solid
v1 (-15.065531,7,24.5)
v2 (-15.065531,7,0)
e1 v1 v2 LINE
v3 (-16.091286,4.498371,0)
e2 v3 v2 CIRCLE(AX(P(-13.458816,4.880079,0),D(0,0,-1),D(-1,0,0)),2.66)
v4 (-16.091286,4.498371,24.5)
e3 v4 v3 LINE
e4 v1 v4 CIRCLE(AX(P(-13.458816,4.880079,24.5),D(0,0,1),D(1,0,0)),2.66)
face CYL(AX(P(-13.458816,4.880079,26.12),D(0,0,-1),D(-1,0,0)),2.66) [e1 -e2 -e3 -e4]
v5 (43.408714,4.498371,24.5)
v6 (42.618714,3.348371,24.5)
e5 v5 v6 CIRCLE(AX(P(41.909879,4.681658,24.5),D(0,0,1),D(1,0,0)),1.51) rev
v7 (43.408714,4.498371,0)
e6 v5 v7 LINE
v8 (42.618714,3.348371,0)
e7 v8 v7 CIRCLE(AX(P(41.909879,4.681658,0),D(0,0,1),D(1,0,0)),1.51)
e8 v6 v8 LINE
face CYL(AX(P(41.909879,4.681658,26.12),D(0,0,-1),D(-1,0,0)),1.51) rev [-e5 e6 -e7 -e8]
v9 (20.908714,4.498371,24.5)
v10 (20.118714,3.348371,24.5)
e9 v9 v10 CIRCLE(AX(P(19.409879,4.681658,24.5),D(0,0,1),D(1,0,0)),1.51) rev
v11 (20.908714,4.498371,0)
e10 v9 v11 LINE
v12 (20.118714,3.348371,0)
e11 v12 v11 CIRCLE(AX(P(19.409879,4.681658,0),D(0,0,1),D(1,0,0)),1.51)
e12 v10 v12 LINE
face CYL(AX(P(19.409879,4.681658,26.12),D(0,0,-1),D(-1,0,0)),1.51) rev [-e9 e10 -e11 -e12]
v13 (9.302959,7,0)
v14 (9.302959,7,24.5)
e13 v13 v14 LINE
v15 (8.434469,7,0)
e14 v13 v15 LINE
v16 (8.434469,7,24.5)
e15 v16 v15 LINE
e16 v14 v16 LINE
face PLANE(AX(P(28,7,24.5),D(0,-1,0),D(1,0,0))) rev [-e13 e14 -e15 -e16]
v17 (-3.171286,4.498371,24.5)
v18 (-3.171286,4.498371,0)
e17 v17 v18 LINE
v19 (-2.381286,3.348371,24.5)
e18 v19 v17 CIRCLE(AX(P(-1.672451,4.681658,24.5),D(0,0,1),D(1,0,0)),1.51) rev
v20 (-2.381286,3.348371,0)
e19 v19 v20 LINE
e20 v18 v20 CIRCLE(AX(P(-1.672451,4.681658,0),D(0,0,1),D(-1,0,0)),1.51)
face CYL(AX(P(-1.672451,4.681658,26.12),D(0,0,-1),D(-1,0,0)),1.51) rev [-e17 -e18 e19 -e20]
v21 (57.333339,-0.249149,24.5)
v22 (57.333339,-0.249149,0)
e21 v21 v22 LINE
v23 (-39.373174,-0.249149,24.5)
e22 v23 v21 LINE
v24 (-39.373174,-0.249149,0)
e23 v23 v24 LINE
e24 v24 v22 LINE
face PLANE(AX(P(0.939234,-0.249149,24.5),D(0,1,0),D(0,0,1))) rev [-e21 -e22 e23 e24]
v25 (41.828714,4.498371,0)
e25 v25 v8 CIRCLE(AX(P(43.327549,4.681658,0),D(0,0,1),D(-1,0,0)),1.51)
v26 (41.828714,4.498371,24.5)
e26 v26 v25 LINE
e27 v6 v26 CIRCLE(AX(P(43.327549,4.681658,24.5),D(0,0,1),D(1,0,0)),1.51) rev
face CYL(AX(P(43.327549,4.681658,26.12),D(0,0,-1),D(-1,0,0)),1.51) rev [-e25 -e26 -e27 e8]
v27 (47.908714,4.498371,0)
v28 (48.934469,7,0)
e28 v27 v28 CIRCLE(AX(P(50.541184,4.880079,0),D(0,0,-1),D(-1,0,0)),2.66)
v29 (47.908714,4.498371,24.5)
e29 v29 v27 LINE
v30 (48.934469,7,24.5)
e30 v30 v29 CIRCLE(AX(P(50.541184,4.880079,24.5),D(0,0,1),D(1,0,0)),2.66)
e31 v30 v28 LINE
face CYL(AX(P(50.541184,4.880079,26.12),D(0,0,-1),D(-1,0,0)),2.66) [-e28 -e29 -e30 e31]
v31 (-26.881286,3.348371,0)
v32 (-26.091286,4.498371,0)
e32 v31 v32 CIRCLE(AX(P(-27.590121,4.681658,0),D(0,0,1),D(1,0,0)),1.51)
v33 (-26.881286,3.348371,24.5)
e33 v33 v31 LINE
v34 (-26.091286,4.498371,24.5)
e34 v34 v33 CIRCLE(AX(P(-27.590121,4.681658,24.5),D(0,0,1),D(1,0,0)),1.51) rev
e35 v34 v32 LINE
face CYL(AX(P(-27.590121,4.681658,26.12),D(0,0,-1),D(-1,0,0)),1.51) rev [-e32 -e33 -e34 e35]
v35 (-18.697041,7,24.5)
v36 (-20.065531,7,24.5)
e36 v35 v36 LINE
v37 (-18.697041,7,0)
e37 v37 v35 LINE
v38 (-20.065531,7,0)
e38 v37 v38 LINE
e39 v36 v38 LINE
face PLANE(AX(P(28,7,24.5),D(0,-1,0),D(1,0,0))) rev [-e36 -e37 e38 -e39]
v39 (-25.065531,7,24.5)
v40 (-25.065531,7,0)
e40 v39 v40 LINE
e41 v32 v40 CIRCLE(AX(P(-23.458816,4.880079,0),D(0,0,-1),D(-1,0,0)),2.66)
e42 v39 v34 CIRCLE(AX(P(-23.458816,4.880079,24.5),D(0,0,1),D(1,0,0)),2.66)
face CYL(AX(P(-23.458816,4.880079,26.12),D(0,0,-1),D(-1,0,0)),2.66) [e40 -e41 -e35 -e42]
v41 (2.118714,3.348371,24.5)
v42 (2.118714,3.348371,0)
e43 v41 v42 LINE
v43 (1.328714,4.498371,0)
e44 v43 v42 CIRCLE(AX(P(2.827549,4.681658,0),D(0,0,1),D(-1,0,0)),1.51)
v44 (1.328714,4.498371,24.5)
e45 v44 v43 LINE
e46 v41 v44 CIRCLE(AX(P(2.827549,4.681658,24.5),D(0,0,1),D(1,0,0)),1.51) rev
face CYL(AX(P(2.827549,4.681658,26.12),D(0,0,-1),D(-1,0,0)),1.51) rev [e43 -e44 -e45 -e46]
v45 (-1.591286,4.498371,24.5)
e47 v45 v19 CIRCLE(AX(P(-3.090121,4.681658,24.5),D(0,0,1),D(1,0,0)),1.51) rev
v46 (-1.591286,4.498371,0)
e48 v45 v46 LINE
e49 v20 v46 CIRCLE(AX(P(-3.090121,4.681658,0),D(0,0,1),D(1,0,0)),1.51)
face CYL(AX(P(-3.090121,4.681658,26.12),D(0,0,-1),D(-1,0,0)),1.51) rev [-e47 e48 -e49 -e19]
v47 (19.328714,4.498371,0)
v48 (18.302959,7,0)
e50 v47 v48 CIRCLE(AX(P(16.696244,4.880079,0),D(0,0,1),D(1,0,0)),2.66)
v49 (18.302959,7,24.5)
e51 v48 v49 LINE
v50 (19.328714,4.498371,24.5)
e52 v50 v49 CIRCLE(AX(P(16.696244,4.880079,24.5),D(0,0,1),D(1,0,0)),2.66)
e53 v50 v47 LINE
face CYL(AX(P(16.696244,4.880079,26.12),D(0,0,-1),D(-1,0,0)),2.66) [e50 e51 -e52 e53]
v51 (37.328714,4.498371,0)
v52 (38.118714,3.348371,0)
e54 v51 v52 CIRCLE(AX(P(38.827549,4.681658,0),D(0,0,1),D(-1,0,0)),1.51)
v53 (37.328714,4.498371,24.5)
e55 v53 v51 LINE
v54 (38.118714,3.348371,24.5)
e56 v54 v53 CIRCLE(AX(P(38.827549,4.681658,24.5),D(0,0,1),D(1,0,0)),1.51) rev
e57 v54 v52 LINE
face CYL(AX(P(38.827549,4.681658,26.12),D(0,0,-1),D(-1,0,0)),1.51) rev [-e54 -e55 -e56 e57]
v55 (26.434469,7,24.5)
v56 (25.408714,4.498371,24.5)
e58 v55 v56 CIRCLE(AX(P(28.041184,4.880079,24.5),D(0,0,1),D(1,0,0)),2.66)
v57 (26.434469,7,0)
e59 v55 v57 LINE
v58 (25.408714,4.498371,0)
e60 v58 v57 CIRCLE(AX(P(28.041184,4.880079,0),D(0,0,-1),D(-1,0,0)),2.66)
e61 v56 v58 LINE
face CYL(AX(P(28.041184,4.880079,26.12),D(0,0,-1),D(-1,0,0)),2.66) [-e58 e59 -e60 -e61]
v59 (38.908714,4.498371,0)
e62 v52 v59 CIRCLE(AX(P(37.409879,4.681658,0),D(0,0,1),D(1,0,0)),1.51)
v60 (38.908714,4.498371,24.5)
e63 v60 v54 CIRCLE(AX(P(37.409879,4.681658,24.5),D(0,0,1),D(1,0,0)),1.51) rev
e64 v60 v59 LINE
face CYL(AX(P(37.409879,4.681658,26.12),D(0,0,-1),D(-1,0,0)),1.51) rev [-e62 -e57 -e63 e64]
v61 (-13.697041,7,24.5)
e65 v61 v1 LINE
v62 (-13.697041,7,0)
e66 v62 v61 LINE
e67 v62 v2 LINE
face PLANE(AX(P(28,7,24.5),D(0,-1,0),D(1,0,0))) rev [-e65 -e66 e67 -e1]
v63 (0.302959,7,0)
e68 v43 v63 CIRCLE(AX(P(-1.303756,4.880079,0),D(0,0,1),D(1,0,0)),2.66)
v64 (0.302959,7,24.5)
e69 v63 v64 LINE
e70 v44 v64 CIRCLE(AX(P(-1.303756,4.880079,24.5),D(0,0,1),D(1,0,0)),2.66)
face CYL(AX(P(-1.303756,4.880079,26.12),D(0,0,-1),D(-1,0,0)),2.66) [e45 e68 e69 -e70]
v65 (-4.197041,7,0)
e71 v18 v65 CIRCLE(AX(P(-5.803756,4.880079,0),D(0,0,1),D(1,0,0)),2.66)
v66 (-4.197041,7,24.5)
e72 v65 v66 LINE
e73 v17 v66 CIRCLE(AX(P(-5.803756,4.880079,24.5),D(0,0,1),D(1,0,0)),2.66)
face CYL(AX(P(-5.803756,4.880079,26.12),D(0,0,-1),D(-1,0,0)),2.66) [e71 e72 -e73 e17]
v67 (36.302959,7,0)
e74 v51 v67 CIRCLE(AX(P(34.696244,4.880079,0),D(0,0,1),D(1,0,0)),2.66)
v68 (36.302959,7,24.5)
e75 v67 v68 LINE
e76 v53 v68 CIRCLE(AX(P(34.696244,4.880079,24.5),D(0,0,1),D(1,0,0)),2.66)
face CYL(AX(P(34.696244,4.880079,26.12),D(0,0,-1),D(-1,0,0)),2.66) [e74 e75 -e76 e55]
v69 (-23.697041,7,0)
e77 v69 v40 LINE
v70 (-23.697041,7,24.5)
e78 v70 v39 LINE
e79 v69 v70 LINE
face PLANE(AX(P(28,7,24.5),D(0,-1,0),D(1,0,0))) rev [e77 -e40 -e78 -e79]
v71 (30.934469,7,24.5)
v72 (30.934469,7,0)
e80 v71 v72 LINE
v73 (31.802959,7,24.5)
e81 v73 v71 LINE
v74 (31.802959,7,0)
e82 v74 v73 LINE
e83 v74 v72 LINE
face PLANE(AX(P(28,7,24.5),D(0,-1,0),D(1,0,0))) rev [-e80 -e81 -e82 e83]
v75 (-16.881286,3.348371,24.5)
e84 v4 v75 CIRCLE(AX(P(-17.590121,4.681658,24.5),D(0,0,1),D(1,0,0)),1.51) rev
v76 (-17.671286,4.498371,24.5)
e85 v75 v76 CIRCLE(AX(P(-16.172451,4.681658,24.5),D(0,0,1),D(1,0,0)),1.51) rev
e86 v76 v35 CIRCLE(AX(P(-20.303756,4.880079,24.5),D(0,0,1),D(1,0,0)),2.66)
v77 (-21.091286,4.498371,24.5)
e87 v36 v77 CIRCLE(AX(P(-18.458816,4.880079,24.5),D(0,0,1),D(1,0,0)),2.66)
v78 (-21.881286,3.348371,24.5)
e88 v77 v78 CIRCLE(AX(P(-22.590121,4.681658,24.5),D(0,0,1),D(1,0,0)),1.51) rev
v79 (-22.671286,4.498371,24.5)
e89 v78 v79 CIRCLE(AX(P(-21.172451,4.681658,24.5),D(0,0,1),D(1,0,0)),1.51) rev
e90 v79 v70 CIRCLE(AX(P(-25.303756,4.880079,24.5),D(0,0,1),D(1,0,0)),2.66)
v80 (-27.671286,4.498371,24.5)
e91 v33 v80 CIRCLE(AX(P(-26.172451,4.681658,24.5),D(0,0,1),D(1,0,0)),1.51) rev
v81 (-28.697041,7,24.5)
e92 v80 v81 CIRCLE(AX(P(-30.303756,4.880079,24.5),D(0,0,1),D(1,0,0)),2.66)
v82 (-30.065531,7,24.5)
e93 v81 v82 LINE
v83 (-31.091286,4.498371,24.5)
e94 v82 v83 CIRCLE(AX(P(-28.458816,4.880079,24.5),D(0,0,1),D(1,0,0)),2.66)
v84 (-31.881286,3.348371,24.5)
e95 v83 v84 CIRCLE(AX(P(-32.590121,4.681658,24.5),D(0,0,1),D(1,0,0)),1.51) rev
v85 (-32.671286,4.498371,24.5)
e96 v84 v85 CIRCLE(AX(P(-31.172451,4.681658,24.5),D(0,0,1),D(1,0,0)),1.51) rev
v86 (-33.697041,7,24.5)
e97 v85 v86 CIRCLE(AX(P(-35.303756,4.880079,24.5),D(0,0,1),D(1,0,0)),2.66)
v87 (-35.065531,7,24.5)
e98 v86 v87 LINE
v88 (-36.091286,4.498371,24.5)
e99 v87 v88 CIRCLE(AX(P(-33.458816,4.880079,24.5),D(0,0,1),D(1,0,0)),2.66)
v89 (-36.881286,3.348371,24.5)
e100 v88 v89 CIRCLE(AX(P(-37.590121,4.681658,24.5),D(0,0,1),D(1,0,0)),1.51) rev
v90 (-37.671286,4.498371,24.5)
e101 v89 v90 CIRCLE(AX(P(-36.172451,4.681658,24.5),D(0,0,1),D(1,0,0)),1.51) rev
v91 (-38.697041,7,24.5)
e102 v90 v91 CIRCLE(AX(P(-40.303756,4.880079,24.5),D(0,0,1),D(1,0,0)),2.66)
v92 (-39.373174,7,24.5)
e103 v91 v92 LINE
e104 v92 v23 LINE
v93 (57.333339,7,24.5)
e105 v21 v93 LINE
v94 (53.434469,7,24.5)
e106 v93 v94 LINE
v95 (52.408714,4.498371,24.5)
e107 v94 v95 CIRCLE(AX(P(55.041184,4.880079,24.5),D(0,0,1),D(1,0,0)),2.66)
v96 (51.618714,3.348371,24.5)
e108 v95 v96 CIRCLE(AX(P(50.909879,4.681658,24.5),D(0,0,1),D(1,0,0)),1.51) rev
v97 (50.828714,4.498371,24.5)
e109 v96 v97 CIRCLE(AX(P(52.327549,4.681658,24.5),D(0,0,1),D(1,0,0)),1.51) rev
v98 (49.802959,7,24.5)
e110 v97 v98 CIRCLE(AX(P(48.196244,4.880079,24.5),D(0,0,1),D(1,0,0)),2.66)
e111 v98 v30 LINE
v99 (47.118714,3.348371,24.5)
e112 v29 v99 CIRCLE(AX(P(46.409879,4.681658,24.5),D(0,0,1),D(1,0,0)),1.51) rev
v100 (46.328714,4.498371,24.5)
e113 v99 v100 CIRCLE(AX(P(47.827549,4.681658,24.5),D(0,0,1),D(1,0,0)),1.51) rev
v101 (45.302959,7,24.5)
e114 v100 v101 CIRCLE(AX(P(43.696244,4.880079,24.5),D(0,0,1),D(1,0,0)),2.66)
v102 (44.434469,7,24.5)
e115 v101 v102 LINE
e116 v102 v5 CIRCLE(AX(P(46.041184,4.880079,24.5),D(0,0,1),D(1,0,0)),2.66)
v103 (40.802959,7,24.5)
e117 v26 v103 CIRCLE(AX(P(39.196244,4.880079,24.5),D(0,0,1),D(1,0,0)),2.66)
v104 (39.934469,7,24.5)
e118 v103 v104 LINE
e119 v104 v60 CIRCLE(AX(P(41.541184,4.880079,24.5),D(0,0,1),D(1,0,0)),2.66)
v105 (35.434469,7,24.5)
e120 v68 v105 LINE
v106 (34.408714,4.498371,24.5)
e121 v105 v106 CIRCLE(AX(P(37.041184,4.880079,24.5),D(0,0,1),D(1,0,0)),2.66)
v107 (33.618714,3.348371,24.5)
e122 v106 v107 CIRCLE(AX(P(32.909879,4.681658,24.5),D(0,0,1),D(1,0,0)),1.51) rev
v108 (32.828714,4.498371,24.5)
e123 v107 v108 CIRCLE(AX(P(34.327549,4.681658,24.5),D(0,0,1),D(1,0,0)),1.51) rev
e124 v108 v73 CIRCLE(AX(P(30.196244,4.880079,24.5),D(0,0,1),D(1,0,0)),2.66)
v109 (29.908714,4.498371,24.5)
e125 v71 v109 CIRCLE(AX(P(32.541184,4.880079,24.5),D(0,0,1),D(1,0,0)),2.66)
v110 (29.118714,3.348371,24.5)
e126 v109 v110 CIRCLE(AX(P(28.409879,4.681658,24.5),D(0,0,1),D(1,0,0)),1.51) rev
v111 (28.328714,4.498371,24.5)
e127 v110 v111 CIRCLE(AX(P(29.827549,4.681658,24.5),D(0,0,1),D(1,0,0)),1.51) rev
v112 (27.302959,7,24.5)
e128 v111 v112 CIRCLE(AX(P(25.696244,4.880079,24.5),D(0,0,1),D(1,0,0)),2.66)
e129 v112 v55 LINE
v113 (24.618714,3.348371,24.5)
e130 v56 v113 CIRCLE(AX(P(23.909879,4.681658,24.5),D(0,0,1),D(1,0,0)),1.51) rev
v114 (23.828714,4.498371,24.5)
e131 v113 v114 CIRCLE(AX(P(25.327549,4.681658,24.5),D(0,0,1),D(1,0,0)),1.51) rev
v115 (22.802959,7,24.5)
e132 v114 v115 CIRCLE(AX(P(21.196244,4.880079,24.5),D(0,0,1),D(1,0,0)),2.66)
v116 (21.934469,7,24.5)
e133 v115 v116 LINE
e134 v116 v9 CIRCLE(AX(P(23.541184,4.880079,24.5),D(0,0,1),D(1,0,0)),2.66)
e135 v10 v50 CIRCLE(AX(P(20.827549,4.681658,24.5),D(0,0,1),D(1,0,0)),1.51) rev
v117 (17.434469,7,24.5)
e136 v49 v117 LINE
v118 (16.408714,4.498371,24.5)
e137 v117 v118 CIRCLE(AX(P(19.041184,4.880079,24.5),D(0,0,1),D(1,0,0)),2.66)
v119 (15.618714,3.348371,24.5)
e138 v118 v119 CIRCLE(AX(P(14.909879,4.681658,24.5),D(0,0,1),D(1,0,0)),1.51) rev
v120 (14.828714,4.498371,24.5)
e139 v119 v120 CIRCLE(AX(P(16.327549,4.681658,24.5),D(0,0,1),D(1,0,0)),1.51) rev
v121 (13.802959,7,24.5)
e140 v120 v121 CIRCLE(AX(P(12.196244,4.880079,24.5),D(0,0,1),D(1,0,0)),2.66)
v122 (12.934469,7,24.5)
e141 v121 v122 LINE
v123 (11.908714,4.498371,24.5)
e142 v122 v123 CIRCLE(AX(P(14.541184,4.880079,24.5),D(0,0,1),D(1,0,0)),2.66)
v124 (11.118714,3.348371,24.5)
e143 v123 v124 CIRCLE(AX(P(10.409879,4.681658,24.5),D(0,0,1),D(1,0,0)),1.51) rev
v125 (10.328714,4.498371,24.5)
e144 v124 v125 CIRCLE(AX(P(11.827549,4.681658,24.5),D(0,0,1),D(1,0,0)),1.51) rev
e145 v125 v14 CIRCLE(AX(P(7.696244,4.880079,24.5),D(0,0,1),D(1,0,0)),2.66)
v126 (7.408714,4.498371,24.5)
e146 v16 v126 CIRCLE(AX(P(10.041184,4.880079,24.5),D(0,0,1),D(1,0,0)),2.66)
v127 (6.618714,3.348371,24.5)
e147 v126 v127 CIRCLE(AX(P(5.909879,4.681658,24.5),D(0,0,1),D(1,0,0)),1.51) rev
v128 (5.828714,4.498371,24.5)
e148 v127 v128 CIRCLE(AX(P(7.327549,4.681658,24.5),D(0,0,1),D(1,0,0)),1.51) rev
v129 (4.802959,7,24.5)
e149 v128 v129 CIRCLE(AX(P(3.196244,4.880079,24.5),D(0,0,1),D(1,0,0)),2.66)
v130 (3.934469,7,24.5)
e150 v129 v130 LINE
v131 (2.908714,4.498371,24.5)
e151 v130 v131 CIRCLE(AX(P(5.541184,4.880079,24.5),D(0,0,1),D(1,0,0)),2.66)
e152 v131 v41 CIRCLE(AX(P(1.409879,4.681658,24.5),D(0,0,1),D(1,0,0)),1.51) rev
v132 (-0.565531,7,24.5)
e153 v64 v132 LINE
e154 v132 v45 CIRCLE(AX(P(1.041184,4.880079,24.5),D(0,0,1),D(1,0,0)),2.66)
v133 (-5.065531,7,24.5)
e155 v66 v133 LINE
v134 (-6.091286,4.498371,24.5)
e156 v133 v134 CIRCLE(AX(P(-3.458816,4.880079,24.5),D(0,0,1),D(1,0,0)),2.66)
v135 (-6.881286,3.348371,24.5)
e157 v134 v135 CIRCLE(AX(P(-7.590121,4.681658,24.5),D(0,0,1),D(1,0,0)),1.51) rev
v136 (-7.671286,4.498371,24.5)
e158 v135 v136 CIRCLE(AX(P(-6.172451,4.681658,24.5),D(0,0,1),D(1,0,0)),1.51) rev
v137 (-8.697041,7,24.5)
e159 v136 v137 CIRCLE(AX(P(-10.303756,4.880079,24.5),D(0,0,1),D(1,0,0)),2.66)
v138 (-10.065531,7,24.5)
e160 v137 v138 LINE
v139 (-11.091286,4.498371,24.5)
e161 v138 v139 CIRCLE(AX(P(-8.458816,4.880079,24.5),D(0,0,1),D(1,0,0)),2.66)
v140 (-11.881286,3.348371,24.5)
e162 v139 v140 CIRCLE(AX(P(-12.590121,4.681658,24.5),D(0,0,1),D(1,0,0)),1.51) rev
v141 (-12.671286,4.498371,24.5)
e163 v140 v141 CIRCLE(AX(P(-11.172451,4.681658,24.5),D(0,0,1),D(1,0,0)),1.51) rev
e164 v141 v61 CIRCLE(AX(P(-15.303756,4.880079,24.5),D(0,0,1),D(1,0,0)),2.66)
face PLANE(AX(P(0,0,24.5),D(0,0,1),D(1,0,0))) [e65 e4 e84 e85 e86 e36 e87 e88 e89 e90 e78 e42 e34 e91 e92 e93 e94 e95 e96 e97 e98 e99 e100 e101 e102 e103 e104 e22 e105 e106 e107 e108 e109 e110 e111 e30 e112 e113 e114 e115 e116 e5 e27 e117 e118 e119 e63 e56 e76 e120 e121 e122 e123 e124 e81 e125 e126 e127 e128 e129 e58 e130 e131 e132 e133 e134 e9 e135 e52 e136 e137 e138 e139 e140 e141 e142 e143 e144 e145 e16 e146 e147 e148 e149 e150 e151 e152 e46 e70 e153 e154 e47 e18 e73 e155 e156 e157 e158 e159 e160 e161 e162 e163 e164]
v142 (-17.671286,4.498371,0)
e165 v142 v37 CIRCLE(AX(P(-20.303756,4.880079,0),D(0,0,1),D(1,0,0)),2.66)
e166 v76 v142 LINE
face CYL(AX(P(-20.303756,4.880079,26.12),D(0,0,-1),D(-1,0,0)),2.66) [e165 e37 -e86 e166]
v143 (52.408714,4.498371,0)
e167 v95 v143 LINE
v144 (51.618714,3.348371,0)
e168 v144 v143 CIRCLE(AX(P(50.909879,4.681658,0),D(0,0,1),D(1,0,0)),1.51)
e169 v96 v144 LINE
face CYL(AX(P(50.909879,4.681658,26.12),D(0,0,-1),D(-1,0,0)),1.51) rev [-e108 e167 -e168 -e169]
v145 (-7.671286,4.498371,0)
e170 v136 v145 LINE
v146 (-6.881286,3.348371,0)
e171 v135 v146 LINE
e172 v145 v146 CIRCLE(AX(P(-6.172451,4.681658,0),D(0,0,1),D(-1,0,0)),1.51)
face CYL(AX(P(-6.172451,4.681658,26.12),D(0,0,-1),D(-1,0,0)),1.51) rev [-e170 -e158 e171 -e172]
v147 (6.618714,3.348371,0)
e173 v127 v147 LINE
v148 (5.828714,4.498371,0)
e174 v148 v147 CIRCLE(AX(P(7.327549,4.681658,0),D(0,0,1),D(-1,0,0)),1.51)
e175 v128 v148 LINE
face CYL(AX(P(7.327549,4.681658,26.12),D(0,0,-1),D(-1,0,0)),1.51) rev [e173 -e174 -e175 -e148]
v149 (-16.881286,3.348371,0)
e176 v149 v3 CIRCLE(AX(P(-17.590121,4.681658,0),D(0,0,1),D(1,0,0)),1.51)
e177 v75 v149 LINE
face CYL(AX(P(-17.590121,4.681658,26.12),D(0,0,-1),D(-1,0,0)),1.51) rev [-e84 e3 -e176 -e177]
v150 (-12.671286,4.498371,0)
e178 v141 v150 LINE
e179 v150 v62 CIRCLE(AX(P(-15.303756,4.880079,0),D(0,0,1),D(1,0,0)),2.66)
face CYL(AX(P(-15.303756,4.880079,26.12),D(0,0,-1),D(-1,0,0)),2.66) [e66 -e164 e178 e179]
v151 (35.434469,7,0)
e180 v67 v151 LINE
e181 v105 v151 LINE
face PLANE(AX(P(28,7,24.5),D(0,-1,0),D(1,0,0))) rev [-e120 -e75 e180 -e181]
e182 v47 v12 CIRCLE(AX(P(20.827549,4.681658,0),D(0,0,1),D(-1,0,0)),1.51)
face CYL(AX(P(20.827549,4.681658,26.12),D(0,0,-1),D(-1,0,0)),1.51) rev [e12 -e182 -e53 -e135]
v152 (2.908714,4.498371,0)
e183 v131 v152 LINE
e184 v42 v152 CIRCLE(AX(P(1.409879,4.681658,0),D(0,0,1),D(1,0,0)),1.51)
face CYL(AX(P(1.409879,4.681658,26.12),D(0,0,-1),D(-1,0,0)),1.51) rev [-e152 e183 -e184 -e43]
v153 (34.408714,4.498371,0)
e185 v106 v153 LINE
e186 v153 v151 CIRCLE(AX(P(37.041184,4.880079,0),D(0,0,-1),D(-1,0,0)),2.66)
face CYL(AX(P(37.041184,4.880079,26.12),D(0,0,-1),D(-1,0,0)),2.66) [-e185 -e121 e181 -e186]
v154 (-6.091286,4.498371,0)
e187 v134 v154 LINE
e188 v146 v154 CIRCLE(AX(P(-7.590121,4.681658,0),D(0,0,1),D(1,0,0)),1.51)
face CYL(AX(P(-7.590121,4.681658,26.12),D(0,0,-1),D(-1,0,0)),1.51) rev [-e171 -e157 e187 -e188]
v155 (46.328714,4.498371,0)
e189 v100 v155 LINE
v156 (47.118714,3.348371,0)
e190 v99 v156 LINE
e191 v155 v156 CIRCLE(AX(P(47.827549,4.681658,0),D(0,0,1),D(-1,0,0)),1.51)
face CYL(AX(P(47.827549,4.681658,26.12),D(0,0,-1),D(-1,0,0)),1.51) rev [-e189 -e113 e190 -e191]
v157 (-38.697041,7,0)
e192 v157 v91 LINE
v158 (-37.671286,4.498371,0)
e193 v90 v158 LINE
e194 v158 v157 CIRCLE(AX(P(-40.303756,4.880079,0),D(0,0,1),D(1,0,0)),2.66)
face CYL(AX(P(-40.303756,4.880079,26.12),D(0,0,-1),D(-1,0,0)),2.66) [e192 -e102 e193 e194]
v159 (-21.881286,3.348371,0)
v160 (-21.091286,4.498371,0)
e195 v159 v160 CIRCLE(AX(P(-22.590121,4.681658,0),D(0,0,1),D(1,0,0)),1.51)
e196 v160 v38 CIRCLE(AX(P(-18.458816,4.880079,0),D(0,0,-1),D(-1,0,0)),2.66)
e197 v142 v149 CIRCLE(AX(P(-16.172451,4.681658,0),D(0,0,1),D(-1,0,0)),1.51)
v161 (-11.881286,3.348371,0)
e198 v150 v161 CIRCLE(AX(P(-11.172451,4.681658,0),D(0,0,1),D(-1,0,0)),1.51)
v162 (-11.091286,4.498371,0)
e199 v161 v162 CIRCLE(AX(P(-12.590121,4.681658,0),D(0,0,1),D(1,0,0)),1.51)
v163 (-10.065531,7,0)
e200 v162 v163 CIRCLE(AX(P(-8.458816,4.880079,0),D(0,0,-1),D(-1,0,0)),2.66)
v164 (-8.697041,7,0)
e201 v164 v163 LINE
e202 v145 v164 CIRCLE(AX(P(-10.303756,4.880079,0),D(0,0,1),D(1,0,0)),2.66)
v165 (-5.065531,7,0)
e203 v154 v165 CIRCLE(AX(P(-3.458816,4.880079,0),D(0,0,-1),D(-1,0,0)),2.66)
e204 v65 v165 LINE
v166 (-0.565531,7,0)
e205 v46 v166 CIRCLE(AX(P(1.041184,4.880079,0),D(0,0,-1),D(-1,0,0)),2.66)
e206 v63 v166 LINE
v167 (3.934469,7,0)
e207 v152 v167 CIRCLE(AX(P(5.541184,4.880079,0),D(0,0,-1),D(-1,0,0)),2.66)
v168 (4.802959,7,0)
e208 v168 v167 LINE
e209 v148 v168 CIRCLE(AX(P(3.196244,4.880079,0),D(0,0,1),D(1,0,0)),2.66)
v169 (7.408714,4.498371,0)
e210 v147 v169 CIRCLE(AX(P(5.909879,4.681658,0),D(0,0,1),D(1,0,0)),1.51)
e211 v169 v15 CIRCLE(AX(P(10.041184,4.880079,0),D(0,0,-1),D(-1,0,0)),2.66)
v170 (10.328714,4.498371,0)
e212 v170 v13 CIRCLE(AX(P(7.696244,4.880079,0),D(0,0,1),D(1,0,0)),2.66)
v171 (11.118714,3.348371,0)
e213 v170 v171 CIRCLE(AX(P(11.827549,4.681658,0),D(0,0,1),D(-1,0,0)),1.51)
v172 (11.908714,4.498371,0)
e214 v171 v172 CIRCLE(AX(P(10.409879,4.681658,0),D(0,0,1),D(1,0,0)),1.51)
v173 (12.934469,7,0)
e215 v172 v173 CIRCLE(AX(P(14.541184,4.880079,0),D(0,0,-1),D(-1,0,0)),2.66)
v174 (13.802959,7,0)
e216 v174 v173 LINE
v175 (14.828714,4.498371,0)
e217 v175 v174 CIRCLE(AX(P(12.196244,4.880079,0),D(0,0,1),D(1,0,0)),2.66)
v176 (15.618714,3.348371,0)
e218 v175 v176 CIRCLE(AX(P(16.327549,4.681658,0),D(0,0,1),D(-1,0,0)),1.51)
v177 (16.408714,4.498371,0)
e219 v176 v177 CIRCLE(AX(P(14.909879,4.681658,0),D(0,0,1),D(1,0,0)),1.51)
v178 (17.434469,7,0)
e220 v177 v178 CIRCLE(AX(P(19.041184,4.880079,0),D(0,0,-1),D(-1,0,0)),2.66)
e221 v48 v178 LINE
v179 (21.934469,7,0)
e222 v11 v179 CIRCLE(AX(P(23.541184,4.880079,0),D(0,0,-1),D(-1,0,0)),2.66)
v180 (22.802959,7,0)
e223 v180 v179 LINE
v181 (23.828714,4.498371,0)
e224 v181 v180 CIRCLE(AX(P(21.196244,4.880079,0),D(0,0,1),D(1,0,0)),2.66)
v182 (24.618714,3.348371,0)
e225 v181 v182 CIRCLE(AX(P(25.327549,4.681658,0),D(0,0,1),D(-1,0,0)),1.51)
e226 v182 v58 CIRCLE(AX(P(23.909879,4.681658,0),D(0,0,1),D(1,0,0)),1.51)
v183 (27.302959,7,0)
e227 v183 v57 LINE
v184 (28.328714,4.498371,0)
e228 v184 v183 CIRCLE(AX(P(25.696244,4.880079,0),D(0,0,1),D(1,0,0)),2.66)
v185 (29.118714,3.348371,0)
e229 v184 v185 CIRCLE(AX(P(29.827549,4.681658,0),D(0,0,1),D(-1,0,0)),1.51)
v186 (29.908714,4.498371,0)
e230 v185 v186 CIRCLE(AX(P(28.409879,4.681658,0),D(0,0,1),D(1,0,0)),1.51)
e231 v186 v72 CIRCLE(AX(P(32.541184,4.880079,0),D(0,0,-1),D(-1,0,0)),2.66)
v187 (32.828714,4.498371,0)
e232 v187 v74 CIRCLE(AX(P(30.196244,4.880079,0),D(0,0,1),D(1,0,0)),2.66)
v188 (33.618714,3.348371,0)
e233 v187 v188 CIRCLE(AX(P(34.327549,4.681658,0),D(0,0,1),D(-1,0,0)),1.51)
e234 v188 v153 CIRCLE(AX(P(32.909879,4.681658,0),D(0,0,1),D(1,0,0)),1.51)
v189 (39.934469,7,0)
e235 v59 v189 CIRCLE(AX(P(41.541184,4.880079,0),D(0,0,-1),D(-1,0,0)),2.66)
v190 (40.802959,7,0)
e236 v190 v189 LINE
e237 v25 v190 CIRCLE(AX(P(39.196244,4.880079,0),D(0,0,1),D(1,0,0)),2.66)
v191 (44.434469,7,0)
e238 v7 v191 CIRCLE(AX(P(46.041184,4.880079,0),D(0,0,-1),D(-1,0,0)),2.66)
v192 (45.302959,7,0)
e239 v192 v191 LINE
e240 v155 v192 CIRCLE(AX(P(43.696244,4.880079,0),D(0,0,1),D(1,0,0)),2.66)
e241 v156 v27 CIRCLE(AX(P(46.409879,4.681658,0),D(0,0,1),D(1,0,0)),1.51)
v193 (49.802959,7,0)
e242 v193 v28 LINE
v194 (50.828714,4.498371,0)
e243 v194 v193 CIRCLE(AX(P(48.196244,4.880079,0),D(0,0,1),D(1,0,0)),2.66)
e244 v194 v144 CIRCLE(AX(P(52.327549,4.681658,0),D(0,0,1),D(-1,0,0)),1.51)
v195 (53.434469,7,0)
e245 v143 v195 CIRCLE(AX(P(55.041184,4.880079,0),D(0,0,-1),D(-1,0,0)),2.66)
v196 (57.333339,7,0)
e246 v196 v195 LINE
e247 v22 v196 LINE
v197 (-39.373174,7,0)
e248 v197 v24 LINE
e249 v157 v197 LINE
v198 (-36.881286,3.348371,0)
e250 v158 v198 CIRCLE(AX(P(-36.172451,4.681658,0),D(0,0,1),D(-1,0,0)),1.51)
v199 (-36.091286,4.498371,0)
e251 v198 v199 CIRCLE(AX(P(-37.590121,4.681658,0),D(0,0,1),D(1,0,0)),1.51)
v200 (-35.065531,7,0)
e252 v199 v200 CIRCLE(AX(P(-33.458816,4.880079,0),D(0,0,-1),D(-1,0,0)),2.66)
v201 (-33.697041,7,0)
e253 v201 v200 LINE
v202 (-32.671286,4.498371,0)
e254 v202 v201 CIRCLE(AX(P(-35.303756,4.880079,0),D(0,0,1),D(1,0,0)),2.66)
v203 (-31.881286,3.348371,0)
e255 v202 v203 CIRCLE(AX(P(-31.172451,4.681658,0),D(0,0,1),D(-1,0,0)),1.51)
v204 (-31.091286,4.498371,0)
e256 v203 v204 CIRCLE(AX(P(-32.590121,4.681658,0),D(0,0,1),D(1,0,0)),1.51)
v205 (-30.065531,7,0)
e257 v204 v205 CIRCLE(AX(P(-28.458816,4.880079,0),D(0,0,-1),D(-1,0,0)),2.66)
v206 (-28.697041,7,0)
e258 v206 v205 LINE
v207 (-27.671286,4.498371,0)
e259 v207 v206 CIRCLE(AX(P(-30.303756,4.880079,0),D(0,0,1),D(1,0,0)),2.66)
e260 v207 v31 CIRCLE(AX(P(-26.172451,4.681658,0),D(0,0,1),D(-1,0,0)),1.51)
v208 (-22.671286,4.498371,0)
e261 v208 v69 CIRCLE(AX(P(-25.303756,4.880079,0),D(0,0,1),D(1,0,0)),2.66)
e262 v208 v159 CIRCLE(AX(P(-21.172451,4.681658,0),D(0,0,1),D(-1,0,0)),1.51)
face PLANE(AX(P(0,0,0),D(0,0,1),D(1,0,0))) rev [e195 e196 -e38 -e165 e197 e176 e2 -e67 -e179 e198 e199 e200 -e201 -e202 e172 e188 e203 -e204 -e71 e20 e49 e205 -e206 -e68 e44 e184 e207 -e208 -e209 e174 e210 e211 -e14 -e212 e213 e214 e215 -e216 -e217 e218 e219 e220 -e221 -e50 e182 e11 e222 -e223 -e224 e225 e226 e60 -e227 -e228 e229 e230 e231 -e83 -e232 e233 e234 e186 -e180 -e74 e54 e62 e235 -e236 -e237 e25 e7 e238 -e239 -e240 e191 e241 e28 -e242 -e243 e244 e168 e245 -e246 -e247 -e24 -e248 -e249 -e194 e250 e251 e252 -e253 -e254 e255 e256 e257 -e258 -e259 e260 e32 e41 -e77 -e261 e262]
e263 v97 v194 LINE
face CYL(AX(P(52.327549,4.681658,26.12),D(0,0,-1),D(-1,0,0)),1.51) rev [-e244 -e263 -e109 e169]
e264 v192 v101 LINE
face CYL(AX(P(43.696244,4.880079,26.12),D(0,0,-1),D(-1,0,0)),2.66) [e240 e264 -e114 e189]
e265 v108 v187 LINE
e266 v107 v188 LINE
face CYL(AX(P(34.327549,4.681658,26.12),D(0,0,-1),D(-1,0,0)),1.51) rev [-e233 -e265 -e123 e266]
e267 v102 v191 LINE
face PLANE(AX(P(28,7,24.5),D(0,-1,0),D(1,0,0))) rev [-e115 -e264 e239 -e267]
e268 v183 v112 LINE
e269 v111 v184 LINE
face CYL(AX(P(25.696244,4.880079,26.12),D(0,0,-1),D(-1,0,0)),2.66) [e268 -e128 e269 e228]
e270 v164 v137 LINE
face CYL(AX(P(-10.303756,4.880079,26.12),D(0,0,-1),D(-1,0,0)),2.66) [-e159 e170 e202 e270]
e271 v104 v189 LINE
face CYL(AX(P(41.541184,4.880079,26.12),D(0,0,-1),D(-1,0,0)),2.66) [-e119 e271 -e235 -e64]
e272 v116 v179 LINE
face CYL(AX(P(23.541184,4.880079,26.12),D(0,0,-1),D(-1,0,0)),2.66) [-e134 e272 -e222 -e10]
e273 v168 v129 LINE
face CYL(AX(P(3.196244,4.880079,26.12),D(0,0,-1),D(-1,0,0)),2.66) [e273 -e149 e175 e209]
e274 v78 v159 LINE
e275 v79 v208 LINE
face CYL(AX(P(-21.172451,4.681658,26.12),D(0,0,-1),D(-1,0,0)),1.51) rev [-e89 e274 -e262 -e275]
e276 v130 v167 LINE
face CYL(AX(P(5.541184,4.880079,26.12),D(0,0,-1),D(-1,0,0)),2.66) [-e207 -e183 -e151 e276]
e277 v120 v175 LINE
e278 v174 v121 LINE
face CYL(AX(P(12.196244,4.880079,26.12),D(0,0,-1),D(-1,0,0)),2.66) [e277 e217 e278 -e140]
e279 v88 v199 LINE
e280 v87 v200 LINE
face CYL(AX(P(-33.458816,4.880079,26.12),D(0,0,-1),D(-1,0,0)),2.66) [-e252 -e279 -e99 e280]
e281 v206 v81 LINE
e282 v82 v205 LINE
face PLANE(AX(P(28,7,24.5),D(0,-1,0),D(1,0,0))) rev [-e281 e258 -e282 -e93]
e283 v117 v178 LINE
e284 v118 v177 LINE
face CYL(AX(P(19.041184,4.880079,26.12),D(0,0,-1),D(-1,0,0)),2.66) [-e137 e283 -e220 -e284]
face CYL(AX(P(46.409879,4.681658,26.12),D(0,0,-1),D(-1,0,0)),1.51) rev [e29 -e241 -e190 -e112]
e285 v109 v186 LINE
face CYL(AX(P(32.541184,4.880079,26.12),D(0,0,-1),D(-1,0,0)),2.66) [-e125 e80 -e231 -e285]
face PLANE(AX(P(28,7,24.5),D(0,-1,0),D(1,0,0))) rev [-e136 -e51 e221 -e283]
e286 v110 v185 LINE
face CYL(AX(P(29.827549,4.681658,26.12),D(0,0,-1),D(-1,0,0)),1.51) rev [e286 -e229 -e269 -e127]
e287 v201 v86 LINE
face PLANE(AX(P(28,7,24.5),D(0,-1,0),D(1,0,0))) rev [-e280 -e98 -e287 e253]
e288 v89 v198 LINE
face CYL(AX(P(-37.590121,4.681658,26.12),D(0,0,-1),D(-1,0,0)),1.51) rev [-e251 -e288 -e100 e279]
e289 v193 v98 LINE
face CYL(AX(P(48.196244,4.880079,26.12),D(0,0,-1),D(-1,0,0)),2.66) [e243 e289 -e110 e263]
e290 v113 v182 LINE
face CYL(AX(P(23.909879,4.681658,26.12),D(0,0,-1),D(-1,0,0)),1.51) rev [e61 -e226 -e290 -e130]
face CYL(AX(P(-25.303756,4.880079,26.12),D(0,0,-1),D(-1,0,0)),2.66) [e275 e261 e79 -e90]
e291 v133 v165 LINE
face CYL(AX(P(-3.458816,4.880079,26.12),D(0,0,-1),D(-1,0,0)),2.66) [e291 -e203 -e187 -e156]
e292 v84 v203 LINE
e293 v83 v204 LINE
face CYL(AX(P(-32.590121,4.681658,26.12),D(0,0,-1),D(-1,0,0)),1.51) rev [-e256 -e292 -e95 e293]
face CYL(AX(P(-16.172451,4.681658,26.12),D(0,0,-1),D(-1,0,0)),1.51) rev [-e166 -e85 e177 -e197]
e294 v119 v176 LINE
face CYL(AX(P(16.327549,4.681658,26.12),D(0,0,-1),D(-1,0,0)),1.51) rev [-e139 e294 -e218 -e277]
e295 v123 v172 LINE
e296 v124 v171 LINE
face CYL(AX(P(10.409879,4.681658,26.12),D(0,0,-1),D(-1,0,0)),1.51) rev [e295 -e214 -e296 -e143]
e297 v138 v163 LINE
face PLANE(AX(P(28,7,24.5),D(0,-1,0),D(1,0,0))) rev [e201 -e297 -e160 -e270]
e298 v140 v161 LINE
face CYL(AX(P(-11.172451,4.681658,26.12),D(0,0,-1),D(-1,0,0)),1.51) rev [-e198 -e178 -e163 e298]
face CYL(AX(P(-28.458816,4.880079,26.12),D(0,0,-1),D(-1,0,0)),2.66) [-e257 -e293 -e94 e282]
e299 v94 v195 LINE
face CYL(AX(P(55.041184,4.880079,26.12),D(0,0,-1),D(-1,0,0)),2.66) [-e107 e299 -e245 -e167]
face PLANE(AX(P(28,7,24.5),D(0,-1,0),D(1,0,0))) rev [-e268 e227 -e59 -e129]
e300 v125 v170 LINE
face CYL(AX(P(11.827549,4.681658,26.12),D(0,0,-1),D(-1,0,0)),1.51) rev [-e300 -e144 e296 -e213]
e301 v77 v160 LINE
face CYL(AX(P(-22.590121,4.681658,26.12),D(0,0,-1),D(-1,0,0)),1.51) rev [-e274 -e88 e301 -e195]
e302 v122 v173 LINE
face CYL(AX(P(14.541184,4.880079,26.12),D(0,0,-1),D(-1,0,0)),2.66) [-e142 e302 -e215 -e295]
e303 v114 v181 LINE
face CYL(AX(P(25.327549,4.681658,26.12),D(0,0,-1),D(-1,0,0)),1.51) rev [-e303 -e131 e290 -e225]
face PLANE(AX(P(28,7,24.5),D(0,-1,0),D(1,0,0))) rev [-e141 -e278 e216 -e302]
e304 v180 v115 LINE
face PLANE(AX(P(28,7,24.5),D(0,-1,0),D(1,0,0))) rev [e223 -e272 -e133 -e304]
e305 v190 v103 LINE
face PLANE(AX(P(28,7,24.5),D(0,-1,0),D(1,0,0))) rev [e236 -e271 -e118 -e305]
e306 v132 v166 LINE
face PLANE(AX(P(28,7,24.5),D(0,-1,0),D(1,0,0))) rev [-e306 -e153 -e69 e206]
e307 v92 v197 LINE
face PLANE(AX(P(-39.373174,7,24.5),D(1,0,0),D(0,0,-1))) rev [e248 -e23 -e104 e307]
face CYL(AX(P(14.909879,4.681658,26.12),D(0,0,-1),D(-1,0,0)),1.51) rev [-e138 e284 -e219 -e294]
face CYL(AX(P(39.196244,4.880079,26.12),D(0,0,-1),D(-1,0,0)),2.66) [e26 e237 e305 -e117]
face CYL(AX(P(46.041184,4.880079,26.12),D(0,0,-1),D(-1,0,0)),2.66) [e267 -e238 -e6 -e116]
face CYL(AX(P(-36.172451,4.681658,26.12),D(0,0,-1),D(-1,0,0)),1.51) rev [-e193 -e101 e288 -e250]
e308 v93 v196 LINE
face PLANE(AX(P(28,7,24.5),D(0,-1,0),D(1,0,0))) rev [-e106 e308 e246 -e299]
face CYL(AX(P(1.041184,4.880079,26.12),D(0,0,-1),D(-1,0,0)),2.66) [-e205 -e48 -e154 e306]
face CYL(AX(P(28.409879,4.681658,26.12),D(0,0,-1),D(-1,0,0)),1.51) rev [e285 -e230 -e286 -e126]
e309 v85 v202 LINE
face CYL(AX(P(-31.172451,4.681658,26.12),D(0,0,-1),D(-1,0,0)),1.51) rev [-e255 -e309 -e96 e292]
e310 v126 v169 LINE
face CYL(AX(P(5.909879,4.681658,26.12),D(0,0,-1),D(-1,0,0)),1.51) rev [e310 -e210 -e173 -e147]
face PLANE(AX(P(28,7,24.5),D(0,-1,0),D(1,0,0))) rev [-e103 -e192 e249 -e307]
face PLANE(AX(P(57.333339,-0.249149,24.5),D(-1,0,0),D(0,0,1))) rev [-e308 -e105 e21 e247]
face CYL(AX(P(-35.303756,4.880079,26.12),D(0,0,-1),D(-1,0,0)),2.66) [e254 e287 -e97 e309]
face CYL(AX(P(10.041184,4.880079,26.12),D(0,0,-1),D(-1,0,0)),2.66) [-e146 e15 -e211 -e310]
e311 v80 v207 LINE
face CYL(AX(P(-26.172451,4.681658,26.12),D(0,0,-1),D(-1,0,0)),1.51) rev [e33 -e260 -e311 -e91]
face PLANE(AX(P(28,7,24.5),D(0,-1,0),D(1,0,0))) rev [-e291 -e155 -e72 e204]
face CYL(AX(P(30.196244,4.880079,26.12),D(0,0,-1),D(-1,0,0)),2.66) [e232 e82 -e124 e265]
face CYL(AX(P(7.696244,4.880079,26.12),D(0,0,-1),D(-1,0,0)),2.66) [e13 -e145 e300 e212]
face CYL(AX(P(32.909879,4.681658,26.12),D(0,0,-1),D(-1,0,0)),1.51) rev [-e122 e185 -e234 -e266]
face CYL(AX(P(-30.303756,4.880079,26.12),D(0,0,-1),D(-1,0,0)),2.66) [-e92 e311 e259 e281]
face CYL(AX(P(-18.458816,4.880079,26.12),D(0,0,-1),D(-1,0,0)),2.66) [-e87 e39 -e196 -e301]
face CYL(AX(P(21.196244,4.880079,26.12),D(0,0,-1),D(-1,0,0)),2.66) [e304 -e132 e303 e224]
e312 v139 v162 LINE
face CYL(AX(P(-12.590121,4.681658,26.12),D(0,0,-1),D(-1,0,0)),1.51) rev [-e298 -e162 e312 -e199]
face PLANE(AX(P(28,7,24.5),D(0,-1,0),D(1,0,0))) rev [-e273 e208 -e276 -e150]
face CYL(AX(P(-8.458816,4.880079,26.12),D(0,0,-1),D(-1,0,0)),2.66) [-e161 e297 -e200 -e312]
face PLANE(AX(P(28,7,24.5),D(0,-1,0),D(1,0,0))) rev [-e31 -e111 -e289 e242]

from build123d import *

# Parameters (mm, degrees)
BOSS_EXTRUDE1_DEPTH = 24.5
CUT_EXTRUDE1_DEPTH  = 26.12
LPATTERN1_COUNT     = 10
LPATTERN1_PITCH     = 5
LPATTERN1_COL_COUNT = 14
LPATTERN1_COL_PITCH = 4.5


with BuildPart() as part:
    # Sketch1 → Boss-Extrude1 (new body)
    with BuildSketch(Plane.XY):
        Polygon((28.000000003, 7), (-39.373173928, 7), (-39.373173928, -0.249149017), (0.939234275, -0.249149017), (57.333339072, -0.249149017), (57.333339072, 7), align=None)
    extrude(amount=BOSS_EXTRUDE1_DEPTH)

    # Sketch2 → Cut-Extrude1 (cut)
    with BuildSketch(Plane.XY):
        with BuildLine():
            ThreePointArc((-6.881285782, 3.348371163), (-7.417069895, 3.826658598), (-7.671285782, 4.498371163))
            ThreePointArc((-7.671285782, 4.498371163), (-7.912320341, 6.04482582), (-8.981285782, 7.188037328))
            ThreePointArc((-8.981285782, 7.188037328), (-6.881285782, 7.762283268), (-4.781285782, 7.188037328))
            ThreePointArc((-4.781285782, 7.188037328), (-5.850251222, 6.04482582), (-6.091285782, 4.498371163))
            ThreePointArc((-6.091285782, 4.498371163), (-6.345501668, 3.826658598), (-6.881285782, 3.348371163))
        make_face()
    cut_extrude1 = extrude(amount=CUT_EXTRUDE1_DEPTH, mode=Mode.SUBTRACT)

    # LPattern1: Cut-Extrude1 ×10
    with Locations(*[(-i * LPATTERN1_PITCH, 0, 0) for i in range(1, LPATTERN1_COUNT)]):
        add(cut_extrude1, mode=Mode.SUBTRACT)

    # LPattern1 col: Cut-Extrude1 ×14
    with Locations(*[(i * LPATTERN1_COL_PITCH, 0, 0) for i in range(1, LPATTERN1_COL_COUNT)]):
        add(cut_extrude1, mode=Mode.SUBTRACT)


solid = part.part
